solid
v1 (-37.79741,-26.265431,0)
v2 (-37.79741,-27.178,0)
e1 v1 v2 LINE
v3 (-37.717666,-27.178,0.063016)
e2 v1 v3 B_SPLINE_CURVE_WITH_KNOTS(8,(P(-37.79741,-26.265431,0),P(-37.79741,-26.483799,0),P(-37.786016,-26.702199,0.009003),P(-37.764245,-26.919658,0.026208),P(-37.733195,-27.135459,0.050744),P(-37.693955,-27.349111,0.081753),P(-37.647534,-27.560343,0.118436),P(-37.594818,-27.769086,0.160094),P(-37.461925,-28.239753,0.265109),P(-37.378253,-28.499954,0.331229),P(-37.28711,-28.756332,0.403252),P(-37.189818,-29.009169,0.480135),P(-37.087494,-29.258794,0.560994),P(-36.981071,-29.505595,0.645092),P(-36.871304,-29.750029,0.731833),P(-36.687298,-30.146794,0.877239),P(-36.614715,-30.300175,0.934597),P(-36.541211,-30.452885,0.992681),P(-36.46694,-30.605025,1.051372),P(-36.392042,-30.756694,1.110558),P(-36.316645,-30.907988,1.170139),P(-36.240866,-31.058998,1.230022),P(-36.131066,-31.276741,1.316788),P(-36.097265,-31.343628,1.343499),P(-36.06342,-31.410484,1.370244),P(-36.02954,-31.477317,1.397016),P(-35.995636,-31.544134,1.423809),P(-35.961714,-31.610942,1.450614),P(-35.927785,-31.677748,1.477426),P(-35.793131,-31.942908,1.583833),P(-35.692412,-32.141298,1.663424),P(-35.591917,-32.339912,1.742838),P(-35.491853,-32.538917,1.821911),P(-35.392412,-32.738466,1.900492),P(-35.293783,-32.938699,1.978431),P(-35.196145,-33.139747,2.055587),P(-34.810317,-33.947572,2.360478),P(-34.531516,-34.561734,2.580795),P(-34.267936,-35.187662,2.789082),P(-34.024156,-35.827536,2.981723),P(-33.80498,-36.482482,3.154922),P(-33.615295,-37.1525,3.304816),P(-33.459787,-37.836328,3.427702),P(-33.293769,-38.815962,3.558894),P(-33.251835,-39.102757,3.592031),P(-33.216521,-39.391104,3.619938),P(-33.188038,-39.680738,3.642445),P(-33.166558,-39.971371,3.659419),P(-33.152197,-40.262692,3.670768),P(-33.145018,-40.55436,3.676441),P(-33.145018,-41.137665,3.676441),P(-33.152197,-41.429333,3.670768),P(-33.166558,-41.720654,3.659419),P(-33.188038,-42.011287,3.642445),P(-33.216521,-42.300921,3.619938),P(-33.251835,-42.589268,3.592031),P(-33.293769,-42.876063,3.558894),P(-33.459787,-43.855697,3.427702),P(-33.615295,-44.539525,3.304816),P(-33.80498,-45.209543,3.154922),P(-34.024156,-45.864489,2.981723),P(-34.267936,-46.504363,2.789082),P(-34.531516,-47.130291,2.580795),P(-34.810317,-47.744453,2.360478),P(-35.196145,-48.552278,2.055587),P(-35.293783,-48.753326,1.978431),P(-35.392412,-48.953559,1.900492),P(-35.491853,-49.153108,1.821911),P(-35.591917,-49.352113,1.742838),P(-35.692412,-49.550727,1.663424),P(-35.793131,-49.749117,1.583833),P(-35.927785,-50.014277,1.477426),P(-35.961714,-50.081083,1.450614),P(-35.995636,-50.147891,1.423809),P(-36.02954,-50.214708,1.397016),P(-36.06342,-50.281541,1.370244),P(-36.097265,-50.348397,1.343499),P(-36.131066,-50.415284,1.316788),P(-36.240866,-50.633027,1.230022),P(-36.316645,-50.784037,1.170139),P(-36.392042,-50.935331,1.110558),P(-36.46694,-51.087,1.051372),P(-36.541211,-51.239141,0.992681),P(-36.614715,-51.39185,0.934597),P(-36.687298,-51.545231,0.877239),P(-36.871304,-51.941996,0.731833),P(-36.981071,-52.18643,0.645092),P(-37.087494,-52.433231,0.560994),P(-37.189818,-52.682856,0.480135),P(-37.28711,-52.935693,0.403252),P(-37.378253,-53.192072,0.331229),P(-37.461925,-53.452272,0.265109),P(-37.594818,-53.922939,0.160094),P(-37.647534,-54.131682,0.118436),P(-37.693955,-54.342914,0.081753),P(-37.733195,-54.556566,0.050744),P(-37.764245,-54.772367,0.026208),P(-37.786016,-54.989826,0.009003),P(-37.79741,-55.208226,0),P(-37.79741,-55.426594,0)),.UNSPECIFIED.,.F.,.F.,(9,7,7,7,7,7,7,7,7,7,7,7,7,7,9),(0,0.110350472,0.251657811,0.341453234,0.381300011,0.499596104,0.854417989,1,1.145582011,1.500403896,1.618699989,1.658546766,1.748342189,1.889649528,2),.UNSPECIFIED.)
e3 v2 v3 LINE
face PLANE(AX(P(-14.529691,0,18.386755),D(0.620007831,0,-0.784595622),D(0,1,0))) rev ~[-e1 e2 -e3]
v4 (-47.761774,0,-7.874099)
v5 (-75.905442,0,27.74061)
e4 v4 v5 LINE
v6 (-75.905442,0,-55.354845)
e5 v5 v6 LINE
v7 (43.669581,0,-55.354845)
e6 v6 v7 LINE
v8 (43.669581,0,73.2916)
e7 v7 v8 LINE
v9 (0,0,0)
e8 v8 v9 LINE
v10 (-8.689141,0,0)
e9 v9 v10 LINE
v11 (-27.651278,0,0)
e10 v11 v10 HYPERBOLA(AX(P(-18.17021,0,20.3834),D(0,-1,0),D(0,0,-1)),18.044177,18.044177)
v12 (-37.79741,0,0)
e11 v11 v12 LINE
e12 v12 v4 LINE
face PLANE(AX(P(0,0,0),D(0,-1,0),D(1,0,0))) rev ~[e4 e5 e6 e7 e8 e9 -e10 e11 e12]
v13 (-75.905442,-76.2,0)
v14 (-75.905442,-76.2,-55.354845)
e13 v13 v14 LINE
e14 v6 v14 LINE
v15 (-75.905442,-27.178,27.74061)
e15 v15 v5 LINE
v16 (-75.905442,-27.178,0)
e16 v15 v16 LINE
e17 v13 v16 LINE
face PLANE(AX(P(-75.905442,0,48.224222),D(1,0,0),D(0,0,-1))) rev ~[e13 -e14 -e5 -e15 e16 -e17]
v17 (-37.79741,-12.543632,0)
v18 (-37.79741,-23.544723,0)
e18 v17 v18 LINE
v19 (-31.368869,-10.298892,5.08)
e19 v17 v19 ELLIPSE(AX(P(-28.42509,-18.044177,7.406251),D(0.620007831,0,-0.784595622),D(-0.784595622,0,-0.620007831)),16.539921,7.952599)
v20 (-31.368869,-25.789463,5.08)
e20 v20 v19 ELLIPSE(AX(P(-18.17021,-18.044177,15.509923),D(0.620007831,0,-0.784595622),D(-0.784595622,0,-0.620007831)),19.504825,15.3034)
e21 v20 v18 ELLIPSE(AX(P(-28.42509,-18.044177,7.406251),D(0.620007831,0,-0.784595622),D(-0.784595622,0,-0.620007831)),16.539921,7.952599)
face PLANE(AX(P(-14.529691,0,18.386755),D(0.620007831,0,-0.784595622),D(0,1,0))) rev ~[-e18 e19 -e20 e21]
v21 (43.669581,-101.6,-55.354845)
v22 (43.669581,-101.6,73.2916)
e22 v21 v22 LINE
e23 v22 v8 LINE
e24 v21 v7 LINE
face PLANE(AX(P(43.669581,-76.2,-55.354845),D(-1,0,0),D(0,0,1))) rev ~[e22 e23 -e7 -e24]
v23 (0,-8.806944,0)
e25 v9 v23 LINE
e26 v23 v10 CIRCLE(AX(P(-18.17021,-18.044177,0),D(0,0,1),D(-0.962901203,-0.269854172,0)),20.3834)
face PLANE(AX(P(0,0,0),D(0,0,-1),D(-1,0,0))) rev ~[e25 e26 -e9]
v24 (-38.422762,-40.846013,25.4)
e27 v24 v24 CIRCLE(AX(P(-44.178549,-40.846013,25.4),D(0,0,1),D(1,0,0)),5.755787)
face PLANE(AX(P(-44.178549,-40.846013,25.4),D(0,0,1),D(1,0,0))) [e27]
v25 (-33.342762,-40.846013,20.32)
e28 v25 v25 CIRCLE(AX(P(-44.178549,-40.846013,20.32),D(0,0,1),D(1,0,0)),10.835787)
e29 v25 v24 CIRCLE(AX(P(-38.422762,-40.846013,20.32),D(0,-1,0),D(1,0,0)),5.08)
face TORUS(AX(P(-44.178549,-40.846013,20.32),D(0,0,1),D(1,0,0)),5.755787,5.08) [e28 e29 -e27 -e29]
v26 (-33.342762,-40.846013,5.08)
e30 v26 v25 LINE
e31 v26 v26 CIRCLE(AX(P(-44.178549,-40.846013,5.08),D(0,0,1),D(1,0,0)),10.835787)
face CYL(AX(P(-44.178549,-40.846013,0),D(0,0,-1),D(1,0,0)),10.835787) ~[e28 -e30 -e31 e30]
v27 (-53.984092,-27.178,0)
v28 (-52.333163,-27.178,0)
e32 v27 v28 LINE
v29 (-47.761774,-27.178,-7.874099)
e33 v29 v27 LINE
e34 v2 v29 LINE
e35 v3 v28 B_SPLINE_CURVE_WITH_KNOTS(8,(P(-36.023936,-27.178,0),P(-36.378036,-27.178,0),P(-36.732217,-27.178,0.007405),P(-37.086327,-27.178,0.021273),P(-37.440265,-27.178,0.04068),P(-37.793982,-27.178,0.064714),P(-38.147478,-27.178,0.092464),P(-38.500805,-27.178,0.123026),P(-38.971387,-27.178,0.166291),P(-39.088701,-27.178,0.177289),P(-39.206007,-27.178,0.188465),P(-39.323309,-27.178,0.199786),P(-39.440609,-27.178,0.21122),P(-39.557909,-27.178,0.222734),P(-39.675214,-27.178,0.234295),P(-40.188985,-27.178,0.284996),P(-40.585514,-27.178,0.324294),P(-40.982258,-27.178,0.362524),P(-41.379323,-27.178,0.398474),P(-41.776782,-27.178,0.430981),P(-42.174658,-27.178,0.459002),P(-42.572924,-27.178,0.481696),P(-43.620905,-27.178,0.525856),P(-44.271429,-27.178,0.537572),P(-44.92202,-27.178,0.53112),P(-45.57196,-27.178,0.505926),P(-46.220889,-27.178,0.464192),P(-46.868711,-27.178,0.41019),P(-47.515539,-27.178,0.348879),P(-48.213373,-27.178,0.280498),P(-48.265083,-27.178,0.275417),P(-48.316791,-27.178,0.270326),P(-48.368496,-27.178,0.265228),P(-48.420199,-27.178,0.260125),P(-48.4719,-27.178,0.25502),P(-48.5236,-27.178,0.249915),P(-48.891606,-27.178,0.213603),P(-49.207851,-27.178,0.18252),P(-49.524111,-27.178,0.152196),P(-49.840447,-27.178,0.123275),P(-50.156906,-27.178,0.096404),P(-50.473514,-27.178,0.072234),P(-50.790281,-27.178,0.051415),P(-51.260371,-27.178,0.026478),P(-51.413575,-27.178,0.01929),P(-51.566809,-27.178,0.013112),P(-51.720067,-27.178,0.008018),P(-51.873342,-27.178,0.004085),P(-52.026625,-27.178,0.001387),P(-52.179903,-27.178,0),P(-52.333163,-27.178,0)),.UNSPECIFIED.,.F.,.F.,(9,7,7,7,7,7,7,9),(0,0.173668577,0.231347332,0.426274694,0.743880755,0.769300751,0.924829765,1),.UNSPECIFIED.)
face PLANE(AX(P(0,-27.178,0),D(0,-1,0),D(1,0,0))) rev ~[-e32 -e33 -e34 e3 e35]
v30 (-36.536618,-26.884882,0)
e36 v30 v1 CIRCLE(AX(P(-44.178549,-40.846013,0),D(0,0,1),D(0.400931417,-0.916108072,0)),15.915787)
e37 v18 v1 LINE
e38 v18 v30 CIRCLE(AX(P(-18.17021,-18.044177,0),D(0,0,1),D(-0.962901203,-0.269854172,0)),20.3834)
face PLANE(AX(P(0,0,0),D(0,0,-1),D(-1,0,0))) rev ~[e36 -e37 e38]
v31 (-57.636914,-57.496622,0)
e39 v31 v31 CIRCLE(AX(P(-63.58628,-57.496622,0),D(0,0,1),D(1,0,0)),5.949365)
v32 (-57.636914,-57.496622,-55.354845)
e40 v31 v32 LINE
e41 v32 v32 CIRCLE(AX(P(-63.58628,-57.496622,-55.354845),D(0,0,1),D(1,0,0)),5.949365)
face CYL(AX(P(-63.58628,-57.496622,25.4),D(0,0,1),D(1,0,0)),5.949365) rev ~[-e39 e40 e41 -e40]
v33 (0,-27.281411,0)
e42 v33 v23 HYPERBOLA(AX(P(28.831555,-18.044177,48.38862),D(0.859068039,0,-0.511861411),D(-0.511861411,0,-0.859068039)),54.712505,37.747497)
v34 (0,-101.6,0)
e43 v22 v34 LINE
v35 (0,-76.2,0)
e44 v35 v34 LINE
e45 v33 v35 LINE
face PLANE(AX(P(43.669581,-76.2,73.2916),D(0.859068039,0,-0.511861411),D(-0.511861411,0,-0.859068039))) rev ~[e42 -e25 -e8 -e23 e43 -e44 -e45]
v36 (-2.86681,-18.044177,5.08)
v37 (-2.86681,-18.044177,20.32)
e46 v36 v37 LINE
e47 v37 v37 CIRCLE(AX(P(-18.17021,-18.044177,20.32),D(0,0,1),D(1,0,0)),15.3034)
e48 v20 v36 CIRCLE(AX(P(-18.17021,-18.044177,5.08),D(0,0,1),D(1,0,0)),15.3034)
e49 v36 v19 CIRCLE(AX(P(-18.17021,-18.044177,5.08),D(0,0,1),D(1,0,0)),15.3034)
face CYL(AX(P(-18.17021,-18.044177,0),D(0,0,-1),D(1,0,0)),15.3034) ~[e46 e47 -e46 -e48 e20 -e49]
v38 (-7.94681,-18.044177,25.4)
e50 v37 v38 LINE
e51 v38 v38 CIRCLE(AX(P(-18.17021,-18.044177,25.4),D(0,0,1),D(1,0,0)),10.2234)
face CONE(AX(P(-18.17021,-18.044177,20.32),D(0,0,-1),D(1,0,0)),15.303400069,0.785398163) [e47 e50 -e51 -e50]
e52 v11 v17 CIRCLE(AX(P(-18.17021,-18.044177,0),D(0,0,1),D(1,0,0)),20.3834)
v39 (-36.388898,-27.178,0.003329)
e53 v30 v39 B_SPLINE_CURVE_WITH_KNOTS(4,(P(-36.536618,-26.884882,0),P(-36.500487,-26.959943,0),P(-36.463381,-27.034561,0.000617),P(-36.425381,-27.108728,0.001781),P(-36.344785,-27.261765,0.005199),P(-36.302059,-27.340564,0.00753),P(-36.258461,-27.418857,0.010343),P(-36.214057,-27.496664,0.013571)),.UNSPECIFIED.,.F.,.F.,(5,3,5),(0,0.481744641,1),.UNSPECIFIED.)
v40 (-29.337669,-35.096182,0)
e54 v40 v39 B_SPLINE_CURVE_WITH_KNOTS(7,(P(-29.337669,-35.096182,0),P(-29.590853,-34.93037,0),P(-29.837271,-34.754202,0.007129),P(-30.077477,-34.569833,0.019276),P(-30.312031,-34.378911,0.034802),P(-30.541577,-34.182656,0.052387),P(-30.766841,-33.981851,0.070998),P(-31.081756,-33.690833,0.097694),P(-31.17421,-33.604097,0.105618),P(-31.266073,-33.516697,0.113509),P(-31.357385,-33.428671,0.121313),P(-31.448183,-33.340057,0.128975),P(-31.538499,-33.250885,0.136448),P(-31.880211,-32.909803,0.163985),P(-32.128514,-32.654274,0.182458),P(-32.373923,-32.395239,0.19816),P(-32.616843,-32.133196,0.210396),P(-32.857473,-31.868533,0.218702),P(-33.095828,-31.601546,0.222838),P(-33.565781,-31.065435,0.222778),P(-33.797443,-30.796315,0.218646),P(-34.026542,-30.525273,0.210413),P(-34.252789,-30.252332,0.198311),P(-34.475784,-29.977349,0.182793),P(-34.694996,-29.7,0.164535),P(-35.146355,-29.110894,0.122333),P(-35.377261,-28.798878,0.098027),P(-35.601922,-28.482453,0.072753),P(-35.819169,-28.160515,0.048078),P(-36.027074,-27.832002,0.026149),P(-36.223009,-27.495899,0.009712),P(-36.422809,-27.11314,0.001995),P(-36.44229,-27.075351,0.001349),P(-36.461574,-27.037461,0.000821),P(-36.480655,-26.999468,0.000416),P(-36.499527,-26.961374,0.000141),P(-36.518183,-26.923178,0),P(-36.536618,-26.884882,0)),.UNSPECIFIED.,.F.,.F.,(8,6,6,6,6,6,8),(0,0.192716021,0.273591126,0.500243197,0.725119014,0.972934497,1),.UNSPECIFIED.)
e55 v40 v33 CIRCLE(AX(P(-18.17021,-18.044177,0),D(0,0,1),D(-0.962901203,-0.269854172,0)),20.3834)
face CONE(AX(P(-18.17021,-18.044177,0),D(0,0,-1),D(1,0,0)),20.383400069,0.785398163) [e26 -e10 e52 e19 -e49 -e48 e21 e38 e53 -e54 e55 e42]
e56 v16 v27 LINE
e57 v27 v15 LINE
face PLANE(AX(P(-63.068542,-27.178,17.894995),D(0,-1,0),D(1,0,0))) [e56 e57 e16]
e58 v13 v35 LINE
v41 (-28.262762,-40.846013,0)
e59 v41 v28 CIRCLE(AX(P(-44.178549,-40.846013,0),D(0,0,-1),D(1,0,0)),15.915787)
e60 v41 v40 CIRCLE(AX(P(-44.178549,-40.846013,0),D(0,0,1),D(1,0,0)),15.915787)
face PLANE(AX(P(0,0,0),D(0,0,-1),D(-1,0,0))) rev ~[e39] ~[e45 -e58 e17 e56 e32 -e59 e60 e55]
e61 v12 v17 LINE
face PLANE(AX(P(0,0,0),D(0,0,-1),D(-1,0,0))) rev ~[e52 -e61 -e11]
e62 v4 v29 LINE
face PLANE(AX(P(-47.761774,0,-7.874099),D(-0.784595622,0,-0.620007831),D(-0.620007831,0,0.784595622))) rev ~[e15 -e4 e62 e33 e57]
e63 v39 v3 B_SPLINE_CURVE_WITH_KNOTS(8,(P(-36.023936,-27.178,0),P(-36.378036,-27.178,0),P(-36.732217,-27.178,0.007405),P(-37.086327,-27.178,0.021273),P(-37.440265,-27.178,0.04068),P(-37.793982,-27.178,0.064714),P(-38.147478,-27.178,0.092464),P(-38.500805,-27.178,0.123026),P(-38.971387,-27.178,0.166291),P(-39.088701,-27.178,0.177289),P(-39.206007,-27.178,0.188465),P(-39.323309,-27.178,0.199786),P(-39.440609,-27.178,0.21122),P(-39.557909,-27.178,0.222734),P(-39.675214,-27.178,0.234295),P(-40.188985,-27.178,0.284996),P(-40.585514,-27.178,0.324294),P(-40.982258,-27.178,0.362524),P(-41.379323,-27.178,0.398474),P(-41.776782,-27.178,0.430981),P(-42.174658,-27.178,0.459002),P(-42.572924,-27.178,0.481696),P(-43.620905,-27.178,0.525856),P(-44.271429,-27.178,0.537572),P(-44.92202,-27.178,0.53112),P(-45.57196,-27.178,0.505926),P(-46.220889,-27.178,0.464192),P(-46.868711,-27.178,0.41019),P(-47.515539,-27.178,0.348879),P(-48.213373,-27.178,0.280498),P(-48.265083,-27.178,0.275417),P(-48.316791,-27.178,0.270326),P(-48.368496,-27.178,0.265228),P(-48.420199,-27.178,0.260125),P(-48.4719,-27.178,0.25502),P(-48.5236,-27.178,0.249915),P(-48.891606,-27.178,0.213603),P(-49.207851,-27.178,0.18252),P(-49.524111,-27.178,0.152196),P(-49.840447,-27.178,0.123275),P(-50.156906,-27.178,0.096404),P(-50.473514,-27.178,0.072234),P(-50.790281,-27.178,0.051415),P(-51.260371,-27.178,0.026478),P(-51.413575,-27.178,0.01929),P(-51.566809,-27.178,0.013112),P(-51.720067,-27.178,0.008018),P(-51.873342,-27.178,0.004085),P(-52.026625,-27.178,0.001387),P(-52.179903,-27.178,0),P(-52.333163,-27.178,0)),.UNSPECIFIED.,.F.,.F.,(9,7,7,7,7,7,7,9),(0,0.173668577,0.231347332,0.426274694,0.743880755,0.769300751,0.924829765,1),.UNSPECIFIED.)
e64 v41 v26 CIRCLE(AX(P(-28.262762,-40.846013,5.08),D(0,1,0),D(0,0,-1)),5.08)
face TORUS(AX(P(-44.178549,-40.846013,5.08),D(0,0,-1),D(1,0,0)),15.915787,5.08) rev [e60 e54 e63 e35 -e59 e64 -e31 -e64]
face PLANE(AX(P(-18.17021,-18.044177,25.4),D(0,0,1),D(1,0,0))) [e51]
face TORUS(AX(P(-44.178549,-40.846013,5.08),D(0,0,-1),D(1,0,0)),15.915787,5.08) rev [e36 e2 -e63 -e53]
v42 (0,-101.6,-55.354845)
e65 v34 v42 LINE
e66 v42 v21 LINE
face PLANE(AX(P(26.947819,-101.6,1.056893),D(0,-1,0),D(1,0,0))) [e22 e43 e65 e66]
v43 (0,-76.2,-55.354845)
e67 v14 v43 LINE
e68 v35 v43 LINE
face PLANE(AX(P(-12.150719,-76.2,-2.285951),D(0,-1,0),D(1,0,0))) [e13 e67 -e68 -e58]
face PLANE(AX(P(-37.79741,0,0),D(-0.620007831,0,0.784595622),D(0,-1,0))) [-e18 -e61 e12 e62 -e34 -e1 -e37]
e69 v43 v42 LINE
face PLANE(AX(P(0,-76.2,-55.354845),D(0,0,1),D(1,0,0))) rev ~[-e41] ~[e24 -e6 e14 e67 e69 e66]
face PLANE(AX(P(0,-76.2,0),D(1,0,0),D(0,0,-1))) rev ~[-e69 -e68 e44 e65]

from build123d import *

# Parameters (mm, degrees)
F1_DEPTH = 76.2
F3_DEPTH = 25.4
F5_DEPTH = 49.022
F6_R     = 15.3034000689
F6_R_2   = 10.835787307
F6_R_3   = 5.9493654503
F7_DEPTH = 25.4
F8_DEPTH = 12.7
F9_DEPTH = 120.396


# Not quite as in the source:
# - a fillet or chamfer that OpenCascade refuses, or shapes differently, is made with other operations: its cross-section is extruded or revolved along the edge and cut away or added


with BuildPart() as f1:
    # F0 (on Front) → F1 (new body)
    with BuildSketch(Plane.XZ):
        Polygon((43.6695814133, 73.2915997505), (0, 0), (-37.7974100411, 0), (-75.9054422379, 48.224221915), (-75.9054422379, -55.3548447788), (43.6695814133, -55.3548447788), align=None)
    extrude(amount=F1_DEPTH)

    # F2 (on face) → F3 (join)
    with BuildSketch(Plane.XZ.offset(76.2)):
        Polygon((43.6695814133, 73.2915997505), (0, 0), (0, -55.3548447788), (43.6695814133, -55.3548447788), align=None)
    extrude(amount=F3_DEPTH)

    # F4 (on face) → F5 (cut)
    with BuildSketch(Plane.XZ.offset(76.2)):
        Polygon((-75.9054422379, 0), (-37.7974100411, 0), (-75.9054422379, 48.224221915), align=None)
    extrude(amount=-F5_DEPTH, mode=Mode.SUBTRACT)

    # F6 (on face) → F7 (join)
    with BuildSketch(Plane.XY):
        with Locations((-18.1702096015, -18.0441774428)):
            Circle(F6_R)
        with Locations((-44.1785492003, -40.8460125327)):
            Circle(F6_R_2)
        with Locations((-63.5862797499, -57.4966222048)):
            Circle(F6_R_3)
    extrude(amount=F7_DEPTH)

    # F8 (cut): a face of the model
    f8_faces = [f1.faces().sort_by_distance(p)[0] for p in [
        (-56.8514261395, -13.589, 24.1121109575),
    ]]
    extrude(f8_faces, amount=-F8_DEPTH, mode=Mode.SUBTRACT)

    # F9 (cut): a face of the model
    f9_faces = [f1.faces().sort_by_distance(p)[0] for p in [
        (-63.5862797499, -57.4966222048, 25.4),
    ]]
    extrude(f9_faces, amount=-F9_DEPTH, mode=Mode.SUBTRACT)

    # F10: fillet of radius 5.08 on 3 edges, made by hand

    # F10_s1 → F10_t2 (revolve, cut)
    with BuildSketch(Plane.XZ.offset(40.8460125327)):
        with BuildLine():
            ThreePointArc((-33.3427618933, 20.32), (-34.8306594448, 23.9121024484), (-38.4227618933, 25.4))
            Line((-38.4227618933, 25.4), (-33.3427618933, 25.4))
            Line((-33.3427618933, 25.4), (-33.3427618933, 20.32))
        make_face()
    revolve(axis=Axis((-44.1785492003, -40.8460125327, 25.4), (0, 0, 1)), mode=Mode.SUBTRACT)


with BuildPart() as f10_tool4:
    # F10_s5 → F10_t6 (revolve)
    with BuildSketch(Plane.XZ.offset(40.8460125327)):
        with BuildLine():
            ThreePointArc((-28.2627618933, 0), (-31.8548643417, 1.4878975516), (-33.3427618933, 5.08))
            Line((-33.3427618933, 5.08), (-33.3427618933, 0))
            Line((-33.3427618933, 0), (-28.2627618933, 0))
        make_face()
    revolve(axis=Axis((-44.1785492003, -40.8460125327, 0), (0, 0, 1)))

    split(bisect_by=Plane.XZ.offset(27.178), keep=Keep.TOP)


with BuildPart() as f1_1:
    add(f1.part)

    # F10_t3: union F10_tool4
    add(f10_tool4.part)


with BuildPart() as f10_tool9:
    # F10_s10 → F10_t11 (revolve)
    with BuildSketch(Plane.XZ.offset(40.8460125327)):
        with BuildLine():
            ThreePointArc((-28.2627618933, 0), (-31.8548643417, 1.4878975516), (-33.3427618933, 5.08))
            Line((-33.3427618933, 5.08), (-33.3427618933, 0))
            Line((-33.3427618933, 0), (-28.2627618933, 0))
        make_face()
    revolve(axis=Axis((-44.1785492003, -40.8460125327, 0), (0, 0, 1)))

    split(bisect_by=Plane(origin=(-14.5296914395, 0, 18.3867553359), x_dir=(0, 1, 0), z_dir=(0.6200078307, 0, -0.7845956218)), keep=Keep.TOP)


with BuildPart() as f1_2:
    add(f1_1.part)

    # F10_t8: union F10_tool9
    add(f10_tool9.part)

    # F11: chamfer of 5.08 on 3 edges, made by hand


with BuildPart() as f11_tool2:
    # F11_s3 → F11_t4 (revolve)
    with BuildSketch(Plane.XZ.offset(18.0441774428)):
        Polygon((2.2131904673, 0), (-2.8668095327, 5.08), (-2.8668095327, 0), align=None)
    revolve(axis=Axis((-18.1702096015, -18.0441774428, 0), (0, 0, 1)))

    split(bisect_by=Plane.XZ, keep=Keep.TOP)

    split(bisect_by=Plane(origin=(-14.5296914395, 0, 18.3867553359), x_dir=(0, 1, 0), z_dir=(0.6200078307, 0, -0.7845956218)), keep=Keep.TOP)


with BuildPart() as f1_3:
    add(f1_2.part)

    # F11_t1: union F11_tool2
    add(f11_tool2.part)

    # F11_s7 → F11_t8 (revolve, cut)
    with BuildSketch(Plane.XZ.offset(18.0441774428)):
        Polygon((-2.8668095327, 20.32), (-7.9468095327, 25.4), (-2.8668095327, 25.4), align=None)
    revolve(axis=Axis((-18.1702096015, -18.0441774428, 25.4), (0, 0, 1)), mode=Mode.SUBTRACT)


solid = f1_3.part
